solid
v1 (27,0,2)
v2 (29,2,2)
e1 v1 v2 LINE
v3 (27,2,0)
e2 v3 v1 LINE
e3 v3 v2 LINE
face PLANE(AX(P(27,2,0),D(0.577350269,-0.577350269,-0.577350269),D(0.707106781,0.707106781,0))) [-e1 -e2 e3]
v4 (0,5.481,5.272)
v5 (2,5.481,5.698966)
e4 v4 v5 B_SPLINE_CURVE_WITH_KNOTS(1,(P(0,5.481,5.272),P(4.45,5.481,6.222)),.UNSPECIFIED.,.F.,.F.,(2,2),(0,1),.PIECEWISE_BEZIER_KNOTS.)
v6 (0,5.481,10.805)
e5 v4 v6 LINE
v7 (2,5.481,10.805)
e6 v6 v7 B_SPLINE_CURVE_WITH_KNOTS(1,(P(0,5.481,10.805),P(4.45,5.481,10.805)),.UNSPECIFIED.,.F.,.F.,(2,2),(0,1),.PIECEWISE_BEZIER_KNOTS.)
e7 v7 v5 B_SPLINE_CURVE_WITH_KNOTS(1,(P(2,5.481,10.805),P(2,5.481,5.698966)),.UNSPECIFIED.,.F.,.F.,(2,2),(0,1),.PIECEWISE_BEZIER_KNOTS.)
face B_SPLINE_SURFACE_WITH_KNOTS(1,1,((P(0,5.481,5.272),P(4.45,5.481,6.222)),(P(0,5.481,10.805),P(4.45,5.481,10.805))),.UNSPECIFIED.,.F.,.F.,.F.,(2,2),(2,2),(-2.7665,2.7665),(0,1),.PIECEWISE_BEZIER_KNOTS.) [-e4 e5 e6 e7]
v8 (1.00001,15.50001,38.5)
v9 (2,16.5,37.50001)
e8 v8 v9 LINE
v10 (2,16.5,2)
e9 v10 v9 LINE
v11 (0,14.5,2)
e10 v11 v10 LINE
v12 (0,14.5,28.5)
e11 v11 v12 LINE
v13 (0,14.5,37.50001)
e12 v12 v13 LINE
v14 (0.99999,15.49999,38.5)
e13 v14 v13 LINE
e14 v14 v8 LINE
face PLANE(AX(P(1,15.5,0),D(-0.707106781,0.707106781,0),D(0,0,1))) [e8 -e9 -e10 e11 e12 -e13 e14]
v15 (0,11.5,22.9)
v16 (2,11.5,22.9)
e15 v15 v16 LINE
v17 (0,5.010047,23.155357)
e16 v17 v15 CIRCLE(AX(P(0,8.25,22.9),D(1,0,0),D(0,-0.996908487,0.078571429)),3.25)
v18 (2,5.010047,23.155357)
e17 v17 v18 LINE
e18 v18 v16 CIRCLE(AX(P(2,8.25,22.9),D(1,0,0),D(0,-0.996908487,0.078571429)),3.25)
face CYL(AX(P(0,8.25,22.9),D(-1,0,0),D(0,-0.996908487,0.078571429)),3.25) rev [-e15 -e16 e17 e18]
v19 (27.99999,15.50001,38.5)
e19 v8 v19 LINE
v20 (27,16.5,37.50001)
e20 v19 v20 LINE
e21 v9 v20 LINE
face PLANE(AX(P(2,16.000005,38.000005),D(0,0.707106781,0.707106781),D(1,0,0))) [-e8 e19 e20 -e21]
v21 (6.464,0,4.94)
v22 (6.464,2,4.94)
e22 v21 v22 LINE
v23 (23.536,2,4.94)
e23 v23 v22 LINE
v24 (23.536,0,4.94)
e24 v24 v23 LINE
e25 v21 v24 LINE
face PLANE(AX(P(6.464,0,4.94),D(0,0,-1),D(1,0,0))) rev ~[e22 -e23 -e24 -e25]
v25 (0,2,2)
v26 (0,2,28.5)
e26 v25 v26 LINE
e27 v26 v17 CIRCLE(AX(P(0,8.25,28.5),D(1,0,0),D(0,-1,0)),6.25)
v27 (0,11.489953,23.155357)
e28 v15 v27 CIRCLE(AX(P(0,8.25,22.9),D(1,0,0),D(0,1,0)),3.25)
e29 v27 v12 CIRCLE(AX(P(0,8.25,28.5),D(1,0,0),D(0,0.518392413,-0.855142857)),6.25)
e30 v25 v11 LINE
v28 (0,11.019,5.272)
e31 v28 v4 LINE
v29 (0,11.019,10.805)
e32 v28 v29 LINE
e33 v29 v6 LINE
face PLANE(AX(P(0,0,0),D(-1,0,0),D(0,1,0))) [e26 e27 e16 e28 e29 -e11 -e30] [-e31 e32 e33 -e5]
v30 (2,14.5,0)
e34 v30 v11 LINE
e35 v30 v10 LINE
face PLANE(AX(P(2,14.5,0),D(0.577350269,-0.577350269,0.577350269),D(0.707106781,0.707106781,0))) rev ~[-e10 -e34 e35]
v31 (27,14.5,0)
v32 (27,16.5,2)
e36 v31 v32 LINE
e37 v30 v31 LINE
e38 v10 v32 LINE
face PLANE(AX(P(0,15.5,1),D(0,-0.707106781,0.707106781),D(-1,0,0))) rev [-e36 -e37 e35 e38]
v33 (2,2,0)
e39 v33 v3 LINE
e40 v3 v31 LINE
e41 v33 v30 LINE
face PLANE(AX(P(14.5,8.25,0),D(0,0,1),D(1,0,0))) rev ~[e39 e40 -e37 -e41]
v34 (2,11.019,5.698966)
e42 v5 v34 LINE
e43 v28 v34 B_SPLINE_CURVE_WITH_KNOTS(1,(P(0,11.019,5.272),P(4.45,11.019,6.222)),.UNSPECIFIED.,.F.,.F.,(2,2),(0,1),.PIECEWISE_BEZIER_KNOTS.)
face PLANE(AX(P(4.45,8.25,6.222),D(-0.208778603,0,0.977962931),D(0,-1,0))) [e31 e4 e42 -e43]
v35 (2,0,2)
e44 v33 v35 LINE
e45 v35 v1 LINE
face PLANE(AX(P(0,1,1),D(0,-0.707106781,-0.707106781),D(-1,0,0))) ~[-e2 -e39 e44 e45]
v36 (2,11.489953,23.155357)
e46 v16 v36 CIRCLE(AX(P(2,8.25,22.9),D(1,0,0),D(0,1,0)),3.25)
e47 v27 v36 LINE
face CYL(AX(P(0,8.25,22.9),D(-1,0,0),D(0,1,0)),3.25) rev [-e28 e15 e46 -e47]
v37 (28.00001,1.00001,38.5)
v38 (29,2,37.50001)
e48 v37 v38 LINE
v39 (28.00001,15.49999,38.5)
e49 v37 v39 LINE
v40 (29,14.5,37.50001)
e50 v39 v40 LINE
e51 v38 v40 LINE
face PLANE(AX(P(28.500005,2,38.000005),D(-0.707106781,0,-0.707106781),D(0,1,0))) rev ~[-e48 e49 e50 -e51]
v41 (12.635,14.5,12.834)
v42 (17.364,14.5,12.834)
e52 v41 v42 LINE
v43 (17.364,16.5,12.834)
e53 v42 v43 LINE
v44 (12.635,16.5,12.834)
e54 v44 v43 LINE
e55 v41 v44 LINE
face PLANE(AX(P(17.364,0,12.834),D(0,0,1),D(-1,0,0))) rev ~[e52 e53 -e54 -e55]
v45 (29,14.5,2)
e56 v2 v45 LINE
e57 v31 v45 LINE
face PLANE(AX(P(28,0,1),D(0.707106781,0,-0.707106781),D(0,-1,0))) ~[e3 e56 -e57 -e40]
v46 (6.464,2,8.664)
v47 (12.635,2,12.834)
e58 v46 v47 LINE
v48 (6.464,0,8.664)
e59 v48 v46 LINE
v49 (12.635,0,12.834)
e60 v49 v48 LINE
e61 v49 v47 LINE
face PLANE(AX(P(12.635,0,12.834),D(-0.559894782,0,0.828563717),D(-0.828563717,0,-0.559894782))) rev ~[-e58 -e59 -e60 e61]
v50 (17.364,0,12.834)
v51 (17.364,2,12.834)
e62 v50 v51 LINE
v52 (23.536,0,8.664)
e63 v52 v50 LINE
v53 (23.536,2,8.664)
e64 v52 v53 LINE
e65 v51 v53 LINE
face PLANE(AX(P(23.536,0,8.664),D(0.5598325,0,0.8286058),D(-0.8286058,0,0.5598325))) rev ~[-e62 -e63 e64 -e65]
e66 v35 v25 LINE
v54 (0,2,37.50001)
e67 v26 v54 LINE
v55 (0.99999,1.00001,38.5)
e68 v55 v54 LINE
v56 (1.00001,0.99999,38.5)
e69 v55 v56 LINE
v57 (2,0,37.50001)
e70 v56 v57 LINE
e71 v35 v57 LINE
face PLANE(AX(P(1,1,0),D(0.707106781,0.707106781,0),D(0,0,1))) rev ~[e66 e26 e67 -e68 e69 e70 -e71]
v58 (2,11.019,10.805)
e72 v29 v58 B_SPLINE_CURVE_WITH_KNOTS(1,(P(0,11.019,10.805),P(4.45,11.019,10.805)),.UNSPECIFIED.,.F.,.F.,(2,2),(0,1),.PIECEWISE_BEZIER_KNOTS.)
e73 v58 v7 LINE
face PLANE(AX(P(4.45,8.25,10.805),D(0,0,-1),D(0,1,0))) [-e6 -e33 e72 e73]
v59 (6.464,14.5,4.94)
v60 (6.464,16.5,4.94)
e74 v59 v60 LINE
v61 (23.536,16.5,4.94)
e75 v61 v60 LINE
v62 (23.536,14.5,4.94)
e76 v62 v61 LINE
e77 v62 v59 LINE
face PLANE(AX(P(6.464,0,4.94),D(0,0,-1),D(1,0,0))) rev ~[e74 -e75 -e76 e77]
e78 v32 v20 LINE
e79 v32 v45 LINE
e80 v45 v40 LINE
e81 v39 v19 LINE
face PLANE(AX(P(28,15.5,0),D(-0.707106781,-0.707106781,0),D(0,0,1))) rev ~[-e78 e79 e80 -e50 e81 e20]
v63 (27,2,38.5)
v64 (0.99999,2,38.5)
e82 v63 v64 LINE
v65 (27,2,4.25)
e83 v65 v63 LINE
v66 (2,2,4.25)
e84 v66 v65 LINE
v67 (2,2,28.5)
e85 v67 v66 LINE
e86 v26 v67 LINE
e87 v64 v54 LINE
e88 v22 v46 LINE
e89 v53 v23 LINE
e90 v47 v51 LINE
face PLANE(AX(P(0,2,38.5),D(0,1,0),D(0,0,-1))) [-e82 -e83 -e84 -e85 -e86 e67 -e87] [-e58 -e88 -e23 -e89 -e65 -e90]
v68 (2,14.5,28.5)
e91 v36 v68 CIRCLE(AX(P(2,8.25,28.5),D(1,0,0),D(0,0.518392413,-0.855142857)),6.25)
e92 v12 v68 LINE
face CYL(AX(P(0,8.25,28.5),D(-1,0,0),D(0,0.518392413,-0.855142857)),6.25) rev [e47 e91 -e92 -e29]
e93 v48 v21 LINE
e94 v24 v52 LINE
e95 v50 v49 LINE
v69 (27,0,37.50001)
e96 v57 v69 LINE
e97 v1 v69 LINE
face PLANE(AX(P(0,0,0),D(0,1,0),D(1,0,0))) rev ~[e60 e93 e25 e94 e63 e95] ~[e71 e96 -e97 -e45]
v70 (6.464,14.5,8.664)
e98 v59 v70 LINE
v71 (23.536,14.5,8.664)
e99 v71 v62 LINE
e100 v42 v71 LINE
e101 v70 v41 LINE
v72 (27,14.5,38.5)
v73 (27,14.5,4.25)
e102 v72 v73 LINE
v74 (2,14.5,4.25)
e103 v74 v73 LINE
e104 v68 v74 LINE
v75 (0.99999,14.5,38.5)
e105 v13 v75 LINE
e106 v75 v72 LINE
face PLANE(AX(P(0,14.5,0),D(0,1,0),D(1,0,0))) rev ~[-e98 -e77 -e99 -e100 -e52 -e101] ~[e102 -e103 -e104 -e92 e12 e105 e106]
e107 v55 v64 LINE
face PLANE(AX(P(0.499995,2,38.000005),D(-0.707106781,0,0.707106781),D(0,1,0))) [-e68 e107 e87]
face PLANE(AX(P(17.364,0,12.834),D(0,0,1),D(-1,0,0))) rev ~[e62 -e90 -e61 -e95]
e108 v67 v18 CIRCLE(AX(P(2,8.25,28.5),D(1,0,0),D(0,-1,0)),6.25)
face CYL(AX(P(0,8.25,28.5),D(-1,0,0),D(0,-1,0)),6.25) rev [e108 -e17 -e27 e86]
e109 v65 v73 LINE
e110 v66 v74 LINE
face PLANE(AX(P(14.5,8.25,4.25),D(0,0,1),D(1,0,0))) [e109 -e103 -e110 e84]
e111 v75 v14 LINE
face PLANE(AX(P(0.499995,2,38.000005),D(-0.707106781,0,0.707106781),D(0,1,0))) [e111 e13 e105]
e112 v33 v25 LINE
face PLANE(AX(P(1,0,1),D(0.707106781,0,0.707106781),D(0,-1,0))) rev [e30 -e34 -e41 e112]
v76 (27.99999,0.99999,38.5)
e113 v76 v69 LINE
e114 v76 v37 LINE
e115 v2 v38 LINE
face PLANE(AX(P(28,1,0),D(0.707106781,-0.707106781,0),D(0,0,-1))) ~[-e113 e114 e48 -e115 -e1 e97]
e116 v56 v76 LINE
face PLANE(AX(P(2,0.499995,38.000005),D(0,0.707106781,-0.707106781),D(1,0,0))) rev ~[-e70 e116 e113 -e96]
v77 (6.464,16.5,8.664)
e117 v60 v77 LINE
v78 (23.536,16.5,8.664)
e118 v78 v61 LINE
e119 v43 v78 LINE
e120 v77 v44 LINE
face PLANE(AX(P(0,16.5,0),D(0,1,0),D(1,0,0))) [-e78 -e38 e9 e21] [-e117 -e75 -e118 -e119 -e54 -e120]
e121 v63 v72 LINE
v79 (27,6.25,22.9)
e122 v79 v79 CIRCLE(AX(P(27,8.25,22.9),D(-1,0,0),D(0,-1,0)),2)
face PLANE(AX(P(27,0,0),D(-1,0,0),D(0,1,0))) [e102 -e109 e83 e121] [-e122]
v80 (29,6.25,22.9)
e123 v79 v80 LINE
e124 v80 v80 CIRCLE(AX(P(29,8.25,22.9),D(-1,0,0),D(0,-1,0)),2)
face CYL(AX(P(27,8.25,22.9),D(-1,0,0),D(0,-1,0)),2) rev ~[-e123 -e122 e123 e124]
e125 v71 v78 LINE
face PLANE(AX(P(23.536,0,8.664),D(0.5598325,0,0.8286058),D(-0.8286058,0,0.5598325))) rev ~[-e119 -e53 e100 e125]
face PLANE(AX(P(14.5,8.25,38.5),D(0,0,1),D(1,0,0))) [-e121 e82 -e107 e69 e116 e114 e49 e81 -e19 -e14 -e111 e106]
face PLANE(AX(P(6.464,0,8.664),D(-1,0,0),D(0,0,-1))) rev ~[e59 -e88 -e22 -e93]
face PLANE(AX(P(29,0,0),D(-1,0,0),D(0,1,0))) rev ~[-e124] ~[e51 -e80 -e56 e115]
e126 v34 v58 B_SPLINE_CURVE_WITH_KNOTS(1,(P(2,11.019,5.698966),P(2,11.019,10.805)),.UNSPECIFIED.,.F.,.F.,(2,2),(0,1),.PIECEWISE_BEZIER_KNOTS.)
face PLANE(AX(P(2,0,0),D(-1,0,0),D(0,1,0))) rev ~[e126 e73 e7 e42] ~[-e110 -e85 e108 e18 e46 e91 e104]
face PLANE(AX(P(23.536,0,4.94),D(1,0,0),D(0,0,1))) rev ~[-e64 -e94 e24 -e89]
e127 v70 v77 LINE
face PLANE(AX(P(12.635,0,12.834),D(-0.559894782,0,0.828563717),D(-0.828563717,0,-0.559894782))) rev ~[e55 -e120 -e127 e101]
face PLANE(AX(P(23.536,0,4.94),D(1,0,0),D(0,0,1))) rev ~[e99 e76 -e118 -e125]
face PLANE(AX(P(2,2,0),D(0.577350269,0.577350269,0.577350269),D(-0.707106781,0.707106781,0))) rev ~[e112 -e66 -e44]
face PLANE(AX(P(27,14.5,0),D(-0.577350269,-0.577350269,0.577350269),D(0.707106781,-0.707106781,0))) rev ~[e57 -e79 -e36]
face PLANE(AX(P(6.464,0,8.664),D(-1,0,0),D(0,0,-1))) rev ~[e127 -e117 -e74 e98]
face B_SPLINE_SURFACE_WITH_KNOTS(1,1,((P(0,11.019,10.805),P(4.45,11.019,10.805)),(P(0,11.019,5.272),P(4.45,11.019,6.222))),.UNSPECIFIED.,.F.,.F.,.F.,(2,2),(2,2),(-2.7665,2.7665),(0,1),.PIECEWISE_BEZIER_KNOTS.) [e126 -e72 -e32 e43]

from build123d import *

# Parameters (mm, degrees)
F0_W      = 29
F0_H      = 16.5
F1_DEPTH  = 38.5
F2_T      = -2
F3_DEPTH  = 2.25
F4_SIZE   = 2
F5_SIZE   = 0.99999
F7_DEPTH  = 16.501
F9_DEPTH  = 2
F10_R     = 2
F11_DEPTH = 2.001
F12_W     = 5.538
F12_H     = 5.533
F14_W     = 5.538
F14_H     = 4.583


# Not quite as in the source:
# - a fillet or chamfer is up to 0.001 mm smaller than in the source, because OpenCascade refuses the exact size


with BuildPart() as f1:
    # F0 (on Top) → F1 (new body)
    with BuildSketch(Plane.XY):
        with Locations((14.5, 8.25)):
            Rectangle(F0_W, F0_H)
    extrude(amount=F1_DEPTH)

    # F2
    f2_openings = [f1.faces().sort_by_distance(p)[0] for p in [
        (14.5, 8.25, 38.5),
    ]]
    offset(amount=F2_T, openings=f2_openings)

    # F3 (add): a face of the model
    f3_faces = [f1.faces().sort_by_distance(p)[0] for p in [
        (14.5, 8.25, 2),
    ]]
    extrude(f3_faces, amount=F3_DEPTH)

    # F4
    f4_edges = [f1.edges().sort_by_distance(p)[0] for p in [
        (29, 0, 19.25),
        (29, 16.5, 19.25),
        (0, 0, 19.25),
        (0, 16.5, 19.25),
        (14.5, 0, 0),
        (0, 8.25, 0),
        (14.5, 16.5, 0),
        (29, 8.25, 0),
    ]]
    chamfer(f4_edges, length=F4_SIZE)

    # F5 (size 1 in the source; OpenCascade refuses exactly that, so slightly less here)
    f5_edges = [f1.edges().sort_by_distance(p)[0] for p in [
        (14.5, 0, 38.5),
        (29, 8.25, 38.5),
        (14.5, 16.5, 38.5),
        (0, 8.25, 38.5),
    ]]
    chamfer(f5_edges, length=F5_SIZE)

    # F6 (on face) → F7 (cut, through all)
    with BuildSketch(Plane.XZ):
        Polygon((6.464, 8.664), (6.464, 4.94), (23.536, 4.94), (23.536, 8.664), (17.364, 12.834), (12.635, 12.834), align=None)
    extrude(amount=-F7_DEPTH, mode=Mode.SUBTRACT)

    # F8 (on Right) → F9 (cut, through all)
    with BuildSketch(Plane.YZ):
        with BuildLine():
            Line((14.5, 38.5), (2, 38.5))
            Line((2, 38.5), (2, 28.5))
            ThreePointArc((2, 28.5), (8.25, 34.75), (14.5, 28.5))
            Line((14.5, 28.5), (14.5, 38.5))
        make_face()
        with BuildLine():
            ThreePointArc((14.5, 28.5), (8.25, 34.75), (2, 28.5))
            Line((2, 28.5), (14.5, 28.5))
        make_face()
        with BuildLine():
            Line((14.5, 28.5), (2, 28.5))
            ThreePointArc((2, 28.5), (2.8042583777, 25.4330148055), (5.0100474186, 23.1553571429))
            ThreePointArc((5.0100474186, 23.1553571429), (8.25, 26.15), (11.4899525814, 23.1553571429))
            ThreePointArc((11.4899525814, 23.1553571429), (13.6957416223, 25.4330148055), (14.5, 28.5))
        make_face()
        with BuildLine():
            ThreePointArc((11.4899525814, 23.1553571429), (8.25, 26.15), (5.0100474186, 23.1553571429))
            ThreePointArc((5.0100474186, 23.1553571429), (8.25, 22.25), (11.4899525814, 23.1553571429))
        make_face()
        with BuildLine():
            ThreePointArc((11.4899525814, 23.1553571429), (8.25, 22.25), (5.0100474186, 23.1553571429))
            ThreePointArc((5.0100474186, 23.1553571429), (8.122222634, 19.6525128261), (11.5, 22.9))
            ThreePointArc((11.5, 22.9), (11.4974871739, 23.027777366), (11.4899525814, 23.1553571429))
        make_face()
    extrude(amount=F9_DEPTH, mode=Mode.SUBTRACT)

    # F10 (on face) → F11 (cut, through all)
    with BuildSketch(Plane(origin=(27, 0, 0), x_dir=(0, -1, 0), z_dir=(-1, 0, 0))):
        with Locations((-8.25, 22.9)):
            Circle(F10_R)
    extrude(amount=-F11_DEPTH, mode=Mode.SUBTRACT)

    # F12 (on face) → F15 section 0
    with BuildSketch(Plane(origin=(0, 0, 0), x_dir=(0, -1, 0), z_dir=(-1, 0, 0))):
        with Locations((-8.25, 8.0385)):
            Rectangle(F12_W, F12_H)
    # F14 (on offset) → F15 section 1
    with BuildSketch(Plane(origin=(4.45, 0, 0), x_dir=(0, -1, 0), z_dir=(-1, 0, 0))):
        with Locations((-8.25, 8.5135)):
            Rectangle(F14_W, F14_H)
    loft(mode=Mode.SUBTRACT)


solid = f1.part
